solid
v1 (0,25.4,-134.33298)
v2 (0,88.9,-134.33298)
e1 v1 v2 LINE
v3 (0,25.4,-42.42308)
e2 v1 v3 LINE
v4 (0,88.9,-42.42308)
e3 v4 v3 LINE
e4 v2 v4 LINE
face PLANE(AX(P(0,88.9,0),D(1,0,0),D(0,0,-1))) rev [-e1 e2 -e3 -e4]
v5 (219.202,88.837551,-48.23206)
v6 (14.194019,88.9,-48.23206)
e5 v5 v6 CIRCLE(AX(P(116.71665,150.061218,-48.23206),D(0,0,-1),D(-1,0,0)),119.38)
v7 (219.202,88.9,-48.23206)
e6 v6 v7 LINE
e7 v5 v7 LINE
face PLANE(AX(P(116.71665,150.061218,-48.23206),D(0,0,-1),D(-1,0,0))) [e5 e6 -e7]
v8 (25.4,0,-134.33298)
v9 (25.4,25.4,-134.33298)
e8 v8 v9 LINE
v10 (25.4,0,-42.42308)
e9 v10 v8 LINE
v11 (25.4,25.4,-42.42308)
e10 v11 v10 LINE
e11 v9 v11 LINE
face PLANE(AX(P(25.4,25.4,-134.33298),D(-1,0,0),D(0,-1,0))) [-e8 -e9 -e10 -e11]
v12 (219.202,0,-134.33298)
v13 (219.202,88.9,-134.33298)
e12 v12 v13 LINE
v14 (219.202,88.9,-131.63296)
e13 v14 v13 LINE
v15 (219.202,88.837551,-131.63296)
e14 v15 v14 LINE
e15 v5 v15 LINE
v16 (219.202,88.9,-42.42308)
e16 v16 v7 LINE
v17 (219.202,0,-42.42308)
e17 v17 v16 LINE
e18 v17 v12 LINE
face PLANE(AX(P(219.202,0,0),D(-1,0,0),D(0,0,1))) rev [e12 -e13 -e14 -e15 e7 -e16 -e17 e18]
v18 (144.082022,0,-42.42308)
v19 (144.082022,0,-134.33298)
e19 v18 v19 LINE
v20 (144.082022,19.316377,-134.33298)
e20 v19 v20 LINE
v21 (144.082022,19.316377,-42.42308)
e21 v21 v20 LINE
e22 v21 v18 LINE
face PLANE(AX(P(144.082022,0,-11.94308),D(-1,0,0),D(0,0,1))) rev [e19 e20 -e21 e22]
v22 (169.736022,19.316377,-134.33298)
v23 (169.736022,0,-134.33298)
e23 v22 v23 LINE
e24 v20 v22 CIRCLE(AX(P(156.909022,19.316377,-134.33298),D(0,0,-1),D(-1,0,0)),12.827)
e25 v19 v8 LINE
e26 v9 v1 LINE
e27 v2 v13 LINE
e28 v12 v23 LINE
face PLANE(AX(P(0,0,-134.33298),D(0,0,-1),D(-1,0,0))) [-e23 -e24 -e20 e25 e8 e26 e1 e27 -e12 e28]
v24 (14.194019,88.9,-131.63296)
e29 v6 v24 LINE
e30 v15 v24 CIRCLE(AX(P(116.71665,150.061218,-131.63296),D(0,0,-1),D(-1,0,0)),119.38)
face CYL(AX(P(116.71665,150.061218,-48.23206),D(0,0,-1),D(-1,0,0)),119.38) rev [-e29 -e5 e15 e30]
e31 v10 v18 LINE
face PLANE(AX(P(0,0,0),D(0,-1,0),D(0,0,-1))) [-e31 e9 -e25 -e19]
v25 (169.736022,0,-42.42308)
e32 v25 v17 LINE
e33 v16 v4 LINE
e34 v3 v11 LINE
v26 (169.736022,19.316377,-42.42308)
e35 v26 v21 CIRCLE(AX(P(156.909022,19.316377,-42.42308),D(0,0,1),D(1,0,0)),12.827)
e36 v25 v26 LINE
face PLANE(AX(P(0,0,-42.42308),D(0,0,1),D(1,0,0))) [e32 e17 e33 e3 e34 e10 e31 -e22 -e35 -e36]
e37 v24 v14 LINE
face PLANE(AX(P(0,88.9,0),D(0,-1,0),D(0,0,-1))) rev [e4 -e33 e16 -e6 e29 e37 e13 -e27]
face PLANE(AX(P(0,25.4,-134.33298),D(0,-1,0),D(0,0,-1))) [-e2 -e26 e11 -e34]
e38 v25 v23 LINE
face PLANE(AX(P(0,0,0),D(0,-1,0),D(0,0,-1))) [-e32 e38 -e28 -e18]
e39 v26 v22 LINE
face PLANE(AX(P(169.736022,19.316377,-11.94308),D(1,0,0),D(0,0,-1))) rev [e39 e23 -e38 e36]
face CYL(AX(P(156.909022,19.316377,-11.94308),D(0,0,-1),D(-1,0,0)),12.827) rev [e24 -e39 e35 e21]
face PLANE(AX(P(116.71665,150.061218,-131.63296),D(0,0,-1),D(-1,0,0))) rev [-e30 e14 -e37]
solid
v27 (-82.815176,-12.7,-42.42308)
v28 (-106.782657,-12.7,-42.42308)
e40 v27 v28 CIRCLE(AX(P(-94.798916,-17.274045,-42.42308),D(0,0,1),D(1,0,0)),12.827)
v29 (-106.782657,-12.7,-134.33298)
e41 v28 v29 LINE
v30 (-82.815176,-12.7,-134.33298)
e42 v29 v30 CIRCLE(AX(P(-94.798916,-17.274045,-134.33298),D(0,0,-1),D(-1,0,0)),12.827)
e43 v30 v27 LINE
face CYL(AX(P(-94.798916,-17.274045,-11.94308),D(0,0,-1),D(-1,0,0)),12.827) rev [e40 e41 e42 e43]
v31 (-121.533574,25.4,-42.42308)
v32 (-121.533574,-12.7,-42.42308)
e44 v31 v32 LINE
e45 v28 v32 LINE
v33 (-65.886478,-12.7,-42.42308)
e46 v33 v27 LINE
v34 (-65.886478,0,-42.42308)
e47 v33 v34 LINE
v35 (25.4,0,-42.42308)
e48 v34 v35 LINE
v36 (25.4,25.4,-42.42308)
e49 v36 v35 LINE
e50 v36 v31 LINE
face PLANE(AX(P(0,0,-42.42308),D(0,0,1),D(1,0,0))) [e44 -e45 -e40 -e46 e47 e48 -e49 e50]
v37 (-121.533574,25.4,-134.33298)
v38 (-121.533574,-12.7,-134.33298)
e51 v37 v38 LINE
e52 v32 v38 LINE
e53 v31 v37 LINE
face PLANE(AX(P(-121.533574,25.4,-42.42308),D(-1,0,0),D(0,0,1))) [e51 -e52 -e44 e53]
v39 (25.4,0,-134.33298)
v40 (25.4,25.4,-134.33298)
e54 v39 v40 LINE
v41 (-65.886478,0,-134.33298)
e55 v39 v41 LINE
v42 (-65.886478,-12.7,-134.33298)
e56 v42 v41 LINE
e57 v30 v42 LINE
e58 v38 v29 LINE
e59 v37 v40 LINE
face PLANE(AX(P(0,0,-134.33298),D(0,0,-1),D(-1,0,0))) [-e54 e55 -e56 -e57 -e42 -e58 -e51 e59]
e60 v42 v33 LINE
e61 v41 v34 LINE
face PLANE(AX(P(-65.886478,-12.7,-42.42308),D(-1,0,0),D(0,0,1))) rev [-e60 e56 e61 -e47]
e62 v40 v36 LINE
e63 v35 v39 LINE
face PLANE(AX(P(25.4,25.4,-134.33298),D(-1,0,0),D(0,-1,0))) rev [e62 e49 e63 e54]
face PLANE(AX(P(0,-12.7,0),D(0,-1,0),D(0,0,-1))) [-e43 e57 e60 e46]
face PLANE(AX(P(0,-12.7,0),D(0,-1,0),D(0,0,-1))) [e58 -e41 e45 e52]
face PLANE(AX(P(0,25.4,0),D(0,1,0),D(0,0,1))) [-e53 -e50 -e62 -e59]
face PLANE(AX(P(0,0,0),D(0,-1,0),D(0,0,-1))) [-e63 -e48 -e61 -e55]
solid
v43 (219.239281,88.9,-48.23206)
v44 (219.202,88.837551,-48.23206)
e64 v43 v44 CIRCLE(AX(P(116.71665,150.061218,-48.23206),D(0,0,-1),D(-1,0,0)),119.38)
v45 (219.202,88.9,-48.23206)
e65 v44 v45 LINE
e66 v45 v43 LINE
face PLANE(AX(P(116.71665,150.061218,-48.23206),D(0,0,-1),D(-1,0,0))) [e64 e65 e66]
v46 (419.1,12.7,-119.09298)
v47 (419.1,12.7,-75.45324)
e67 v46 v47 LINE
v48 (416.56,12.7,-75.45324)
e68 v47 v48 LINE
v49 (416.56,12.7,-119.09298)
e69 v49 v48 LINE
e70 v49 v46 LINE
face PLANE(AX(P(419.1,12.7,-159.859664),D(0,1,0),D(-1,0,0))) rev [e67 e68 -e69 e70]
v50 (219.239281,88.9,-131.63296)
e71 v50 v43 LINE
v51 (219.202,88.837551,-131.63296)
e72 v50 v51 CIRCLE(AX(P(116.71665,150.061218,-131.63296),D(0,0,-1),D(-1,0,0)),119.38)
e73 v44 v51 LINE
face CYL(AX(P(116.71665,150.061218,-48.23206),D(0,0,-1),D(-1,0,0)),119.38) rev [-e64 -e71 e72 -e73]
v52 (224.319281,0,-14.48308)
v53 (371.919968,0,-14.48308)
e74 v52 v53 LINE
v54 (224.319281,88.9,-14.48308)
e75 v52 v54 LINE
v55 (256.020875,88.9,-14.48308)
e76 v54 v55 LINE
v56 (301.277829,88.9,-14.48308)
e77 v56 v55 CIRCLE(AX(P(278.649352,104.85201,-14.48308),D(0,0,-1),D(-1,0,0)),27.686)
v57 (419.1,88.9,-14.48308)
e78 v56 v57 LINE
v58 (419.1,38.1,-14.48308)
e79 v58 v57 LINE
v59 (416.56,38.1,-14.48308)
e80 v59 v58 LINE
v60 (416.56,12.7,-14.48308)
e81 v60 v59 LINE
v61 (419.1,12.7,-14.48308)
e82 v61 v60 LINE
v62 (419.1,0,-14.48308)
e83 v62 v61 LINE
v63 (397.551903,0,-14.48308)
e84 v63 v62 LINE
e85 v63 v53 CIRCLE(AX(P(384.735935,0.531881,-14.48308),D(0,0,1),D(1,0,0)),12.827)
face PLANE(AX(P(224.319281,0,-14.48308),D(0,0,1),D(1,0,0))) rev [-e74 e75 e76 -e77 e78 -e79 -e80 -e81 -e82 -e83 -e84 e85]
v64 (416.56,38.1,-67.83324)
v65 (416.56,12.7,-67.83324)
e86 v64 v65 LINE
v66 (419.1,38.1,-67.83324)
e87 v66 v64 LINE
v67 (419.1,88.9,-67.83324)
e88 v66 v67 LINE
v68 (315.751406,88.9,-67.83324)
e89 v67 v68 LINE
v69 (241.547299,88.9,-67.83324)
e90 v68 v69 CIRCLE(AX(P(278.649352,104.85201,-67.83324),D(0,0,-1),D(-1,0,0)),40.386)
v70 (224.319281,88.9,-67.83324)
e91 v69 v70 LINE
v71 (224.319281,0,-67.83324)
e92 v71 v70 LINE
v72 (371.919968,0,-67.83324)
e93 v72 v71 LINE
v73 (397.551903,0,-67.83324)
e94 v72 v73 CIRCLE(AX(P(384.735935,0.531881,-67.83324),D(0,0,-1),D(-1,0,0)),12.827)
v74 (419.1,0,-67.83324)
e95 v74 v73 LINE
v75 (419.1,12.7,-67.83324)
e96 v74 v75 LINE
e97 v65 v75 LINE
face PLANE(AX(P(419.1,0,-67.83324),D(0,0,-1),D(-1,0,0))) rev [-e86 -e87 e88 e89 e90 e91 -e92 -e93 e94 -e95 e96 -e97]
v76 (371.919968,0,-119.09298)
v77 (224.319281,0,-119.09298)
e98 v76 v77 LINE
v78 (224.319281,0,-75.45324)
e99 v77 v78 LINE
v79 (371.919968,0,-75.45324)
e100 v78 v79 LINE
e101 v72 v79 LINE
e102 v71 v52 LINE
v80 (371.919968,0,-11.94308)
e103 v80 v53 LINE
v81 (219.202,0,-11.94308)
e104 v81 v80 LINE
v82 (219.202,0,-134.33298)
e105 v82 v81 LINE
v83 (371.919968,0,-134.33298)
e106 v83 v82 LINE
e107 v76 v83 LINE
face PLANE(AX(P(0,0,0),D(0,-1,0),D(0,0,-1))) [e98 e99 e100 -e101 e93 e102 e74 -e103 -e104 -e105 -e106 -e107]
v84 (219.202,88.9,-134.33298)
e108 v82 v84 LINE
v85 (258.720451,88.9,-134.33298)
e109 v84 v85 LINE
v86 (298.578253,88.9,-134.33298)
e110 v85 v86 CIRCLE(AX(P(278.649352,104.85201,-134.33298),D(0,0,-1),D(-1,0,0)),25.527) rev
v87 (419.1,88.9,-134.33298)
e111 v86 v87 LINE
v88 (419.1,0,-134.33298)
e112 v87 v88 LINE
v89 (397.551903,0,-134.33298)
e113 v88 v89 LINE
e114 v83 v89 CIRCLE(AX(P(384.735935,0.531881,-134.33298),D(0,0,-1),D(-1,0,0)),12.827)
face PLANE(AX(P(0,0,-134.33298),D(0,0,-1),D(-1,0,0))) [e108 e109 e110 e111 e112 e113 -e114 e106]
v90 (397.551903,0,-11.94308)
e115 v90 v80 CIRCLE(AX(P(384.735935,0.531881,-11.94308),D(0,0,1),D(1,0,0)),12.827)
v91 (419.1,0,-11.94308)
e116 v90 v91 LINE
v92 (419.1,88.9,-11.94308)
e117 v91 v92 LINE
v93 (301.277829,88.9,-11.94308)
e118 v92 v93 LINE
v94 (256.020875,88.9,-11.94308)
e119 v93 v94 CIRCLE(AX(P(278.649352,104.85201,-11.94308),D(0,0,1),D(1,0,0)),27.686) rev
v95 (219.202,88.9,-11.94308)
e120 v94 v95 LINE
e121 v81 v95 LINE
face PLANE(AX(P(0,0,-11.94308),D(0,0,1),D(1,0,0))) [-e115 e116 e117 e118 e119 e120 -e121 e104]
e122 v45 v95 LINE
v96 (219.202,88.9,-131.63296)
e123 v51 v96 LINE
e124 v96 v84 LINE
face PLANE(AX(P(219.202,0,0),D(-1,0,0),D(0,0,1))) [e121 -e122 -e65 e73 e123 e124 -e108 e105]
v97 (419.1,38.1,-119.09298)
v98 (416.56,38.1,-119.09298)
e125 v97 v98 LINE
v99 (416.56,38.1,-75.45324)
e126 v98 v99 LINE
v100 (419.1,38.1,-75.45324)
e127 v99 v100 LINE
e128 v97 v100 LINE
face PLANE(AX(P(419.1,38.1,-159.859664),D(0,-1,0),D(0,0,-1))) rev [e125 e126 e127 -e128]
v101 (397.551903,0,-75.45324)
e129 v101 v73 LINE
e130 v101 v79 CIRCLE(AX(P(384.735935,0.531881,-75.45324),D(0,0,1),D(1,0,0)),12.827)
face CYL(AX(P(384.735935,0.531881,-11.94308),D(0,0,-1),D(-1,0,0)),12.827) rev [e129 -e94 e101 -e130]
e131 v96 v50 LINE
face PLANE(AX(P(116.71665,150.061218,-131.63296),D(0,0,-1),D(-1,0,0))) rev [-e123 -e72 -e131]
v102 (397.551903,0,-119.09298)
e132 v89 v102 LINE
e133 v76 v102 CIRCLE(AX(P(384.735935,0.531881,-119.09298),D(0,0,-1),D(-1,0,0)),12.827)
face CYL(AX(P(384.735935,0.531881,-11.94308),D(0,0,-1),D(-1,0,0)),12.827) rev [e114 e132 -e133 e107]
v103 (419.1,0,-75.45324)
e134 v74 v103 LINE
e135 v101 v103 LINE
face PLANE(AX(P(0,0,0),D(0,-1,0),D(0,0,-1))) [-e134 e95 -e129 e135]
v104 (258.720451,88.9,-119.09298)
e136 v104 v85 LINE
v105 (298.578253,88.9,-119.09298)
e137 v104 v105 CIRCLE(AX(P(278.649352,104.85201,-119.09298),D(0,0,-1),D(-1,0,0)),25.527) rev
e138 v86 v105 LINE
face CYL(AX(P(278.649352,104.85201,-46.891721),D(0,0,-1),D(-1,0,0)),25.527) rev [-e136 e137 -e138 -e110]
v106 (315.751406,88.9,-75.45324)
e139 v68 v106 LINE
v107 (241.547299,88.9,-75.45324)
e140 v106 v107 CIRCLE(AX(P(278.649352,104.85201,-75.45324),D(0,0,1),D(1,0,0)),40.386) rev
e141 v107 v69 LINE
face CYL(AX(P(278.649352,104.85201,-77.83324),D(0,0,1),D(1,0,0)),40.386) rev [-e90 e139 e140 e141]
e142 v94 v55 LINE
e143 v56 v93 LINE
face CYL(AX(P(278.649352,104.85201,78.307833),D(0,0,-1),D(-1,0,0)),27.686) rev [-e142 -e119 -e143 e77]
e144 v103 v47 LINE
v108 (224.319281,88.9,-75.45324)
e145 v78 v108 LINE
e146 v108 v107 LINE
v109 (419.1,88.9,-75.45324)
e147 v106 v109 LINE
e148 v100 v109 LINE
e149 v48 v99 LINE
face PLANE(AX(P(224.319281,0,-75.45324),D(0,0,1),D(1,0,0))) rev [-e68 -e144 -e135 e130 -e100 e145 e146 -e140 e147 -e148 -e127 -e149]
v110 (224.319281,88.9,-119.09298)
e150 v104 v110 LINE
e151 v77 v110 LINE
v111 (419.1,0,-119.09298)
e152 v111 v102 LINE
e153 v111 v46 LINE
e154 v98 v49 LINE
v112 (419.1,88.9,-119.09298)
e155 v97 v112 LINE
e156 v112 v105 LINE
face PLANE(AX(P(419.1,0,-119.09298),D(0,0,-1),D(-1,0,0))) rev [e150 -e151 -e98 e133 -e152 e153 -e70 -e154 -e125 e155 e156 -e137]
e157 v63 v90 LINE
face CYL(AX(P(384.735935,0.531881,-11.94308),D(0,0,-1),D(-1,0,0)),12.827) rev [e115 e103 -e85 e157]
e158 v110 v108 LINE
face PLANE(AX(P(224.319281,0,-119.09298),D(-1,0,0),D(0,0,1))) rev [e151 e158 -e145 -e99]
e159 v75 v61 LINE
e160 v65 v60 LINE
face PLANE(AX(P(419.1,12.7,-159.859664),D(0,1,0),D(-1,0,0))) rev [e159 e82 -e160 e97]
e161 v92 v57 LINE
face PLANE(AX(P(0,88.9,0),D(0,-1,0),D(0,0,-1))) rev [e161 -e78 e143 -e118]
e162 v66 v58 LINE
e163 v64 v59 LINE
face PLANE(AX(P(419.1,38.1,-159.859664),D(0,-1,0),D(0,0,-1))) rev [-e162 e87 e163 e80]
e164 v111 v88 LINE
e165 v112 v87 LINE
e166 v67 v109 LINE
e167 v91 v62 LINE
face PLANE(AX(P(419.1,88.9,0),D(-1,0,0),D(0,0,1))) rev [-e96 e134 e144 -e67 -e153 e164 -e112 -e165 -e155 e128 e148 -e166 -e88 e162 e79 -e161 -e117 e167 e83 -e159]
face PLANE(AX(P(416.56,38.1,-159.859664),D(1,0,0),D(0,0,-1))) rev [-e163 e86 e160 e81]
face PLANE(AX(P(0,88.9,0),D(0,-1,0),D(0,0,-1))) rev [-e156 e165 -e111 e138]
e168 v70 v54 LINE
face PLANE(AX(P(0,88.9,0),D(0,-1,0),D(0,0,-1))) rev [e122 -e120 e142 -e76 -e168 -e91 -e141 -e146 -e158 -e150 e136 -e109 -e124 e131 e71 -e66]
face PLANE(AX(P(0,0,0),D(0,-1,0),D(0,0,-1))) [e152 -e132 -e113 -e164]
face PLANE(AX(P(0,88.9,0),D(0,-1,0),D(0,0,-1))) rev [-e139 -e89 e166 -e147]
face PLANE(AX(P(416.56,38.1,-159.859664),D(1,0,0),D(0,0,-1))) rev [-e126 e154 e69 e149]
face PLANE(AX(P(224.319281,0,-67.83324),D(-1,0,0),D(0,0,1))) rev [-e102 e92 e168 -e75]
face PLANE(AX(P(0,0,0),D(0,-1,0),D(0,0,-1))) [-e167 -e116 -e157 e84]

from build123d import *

# Parameters (mm, degrees)
SKETCH1_W           = 419.1
SKETCH1_H           = 142.18412
BOSS_EXTRUDE1_DEPTH = 88.9
SKETCH2_R           = 119.38
CUT_EXTRUDE1_DEPTH  = 83.4009
SKETCH7_W           = 194.780719179
SKETCH7_H           = 43.63974
SKETCH7_H_2         = 53.35016
CUT_EXTRUDE2_DEPTH  = 452.402640644
SKETCH4_R           = 40.386
CUT_EXTRUDE4_DEPTH  = 10
SKETCH18_R          = 25.527
CUT_EXTRUDE11_DEPTH = 23.09114
SKETCH5_R           = 27.686
CUT_EXTRUDE5_DEPTH  = 14.48308
SKETCH8_W           = 419.1
SKETCH8_H           = 88.9
CUT_EXTRUDE6_DEPTH  = 7.85114
SKETCH9_W           = 419.1
SKETCH9_H           = 88.9
CUT_EXTRUDE7_DEPTH  = 11.94308
SKETCH10_W          = 219.202
SKETCH10_H          = 88.9
CUT_EXTRUDE8_DEPTH  = 30.48
SKETCH12_W          = 121.533574186
SKETCH12_H          = 91.9099
BOSS_EXTRUDE2_DEPTH = 25.4
SKETCH14_W          = 55.647095764
SKETCH14_H          = 91.9099
BOSS_EXTRUDE3_DEPTH = 12.7
SKETCH17_R          = 12.827
CUT_EXTRUDE10_DEPTH = 446.564033133
SKETCH20_W          = 2.54
SKETCH20_H          = 25.4
BOSS_EXTRUDE4_DEPTH = 104.6099
SPLIT2_START        = -121.533574186
SPLIT2_DEPTH        = 340.735574186
SPLIT2_START_2      = -134.33298
SPLIT2_2_DEPTH      = 91.9099
SPLIT2_START_3      = -48.23206
SPLIT2_3_DEPTH      = 5.80898
SPLIT2_4_DEPTH      = 2.70002
SPLIT2_5_DEPTH      = 91.9099


# Read off the part's stored shape, not the designer's step: Split2
with BuildPart() as part:
    # Sketch1 → Boss-Extrude1 (new body)
    with BuildSketch(Plane(origin=(0, 0, 0), x_dir=(1, 0, 0), z_dir=(0, 1, 0))):
        with Locations((209.55, 71.09206)):
            Rectangle(SKETCH1_W, SKETCH1_H)
    extrude(amount=BOSS_EXTRUDE1_DEPTH)

    # Sketch2 → Cut-Extrude1 (cut)
    with BuildSketch(Plane(origin=(0, 0, -131.63296), x_dir=(-1, 0, 0), z_dir=(0, 0, -1))):
        with Locations((-116.7166499, 150.061217688)):
            Circle(SKETCH2_R)
    extrude(amount=-CUT_EXTRUDE1_DEPTH, mode=Mode.SUBTRACT)

    # Sketch7 → Cut-Extrude2 (cut, through all)
    with BuildSketch(Plane(origin=(0, 88.9, 0), x_dir=(1, 0, 0), z_dir=(0, 1, 0))):
        with Locations((321.709640411, 97.27311)):
            Rectangle(SKETCH7_W, SKETCH7_H)
        with Locations((321.709640411, 41.15816)):
            Rectangle(SKETCH7_W, SKETCH7_H_2)
    extrude(amount=-CUT_EXTRUDE2_DEPTH, mode=Mode.SUBTRACT)

    # Sketch4 → Cut-Extrude4 (cut)
    with BuildSketch(Plane(origin=(0, 0, -67.83324), x_dir=(-1, 0, 0), z_dir=(0, 0, -1))):
        with Locations((-278.649352085, 104.852009966)):
            Circle(SKETCH4_R)
    extrude(amount=CUT_EXTRUDE4_DEPTH, mode=Mode.SUBTRACT)

    # Sketch18 → Cut-Extrude11 (cut)
    with BuildSketch(Plane(origin=(0, 0, -142.18412), x_dir=(-1, 0, 0), z_dir=(0, 0, -1))):
        with Locations((-278.649352085, 104.852009966)):
            Circle(SKETCH18_R)
    extrude(amount=-CUT_EXTRUDE11_DEPTH, mode=Mode.SUBTRACT)

    # Sketch5 → Cut-Extrude5 (cut)
    with BuildSketch(Plane(origin=(0, 0, -14.48308), x_dir=(-1, 0, 0), z_dir=(0, 0, -1))):
        with Locations((-278.649352085, 104.852009966)):
            Circle(SKETCH5_R)
    extrude(amount=-CUT_EXTRUDE5_DEPTH, mode=Mode.SUBTRACT)

    # Sketch8 → Cut-Extrude6 (cut)
    with BuildSketch(Plane(origin=(0, 0, -142.18412), x_dir=(-1, 0, 0), z_dir=(0, 0, -1))):
        with Locations((-209.55, 44.45)):
            Rectangle(SKETCH8_W, SKETCH8_H)
    extrude(amount=-CUT_EXTRUDE6_DEPTH, mode=Mode.SUBTRACT)

    # Sketch9 → Cut-Extrude7 (cut)
    with BuildSketch(Plane.XY):
        with Locations((209.55, 44.45)):
            Rectangle(SKETCH9_W, SKETCH9_H)
    extrude(amount=-CUT_EXTRUDE7_DEPTH, mode=Mode.SUBTRACT)

    # Sketch10 → Cut-Extrude8 (cut)
    with BuildSketch(Plane.XY.offset(-11.94308)):
        with Locations((109.601, 44.45)):
            Rectangle(SKETCH10_W, SKETCH10_H)
    extrude(amount=-CUT_EXTRUDE8_DEPTH, mode=Mode.SUBTRACT)

    # Sketch12 → Boss-Extrude2 (add)
    with BuildSketch(Plane.XZ):
        with Locations((-60.766787093, -88.37803)):
            Rectangle(SKETCH12_W, SKETCH12_H)
    extrude(amount=-BOSS_EXTRUDE2_DEPTH)

    # Sketch14 → Boss-Extrude3 (add)
    with BuildSketch(Plane.XZ):
        with Locations((-93.710026304, -88.37803)):
            Rectangle(SKETCH14_W, SKETCH14_H)
    extrude(amount=BOSS_EXTRUDE3_DEPTH)

    # Sketch17 → Cut-Extrude10 (cut, through all)
    with BuildSketch(Plane(origin=(0, 0, -134.33298), x_dir=(-1, 0, 0), z_dir=(0, 0, -1))):
        with Locations((-384.735935495, 0.531880938)):
            Circle(SKETCH17_R)
        with Locations((94.798916194, -17.274045482)):
            Circle(SKETCH17_R)
        with BuildLine():
            Line((-169.736021607, 19.31637742), (-169.736021607, 0))
            Line((-169.736021607, 0), (-144.082021607, 0))
            Line((-144.082021607, 0), (-144.082021607, 19.31637742))
            ThreePointArc((-144.082021607, 19.31637742), (-156.909021607, 32.14337742), (-169.736021607, 19.31637742))
        make_face()
    extrude(amount=-CUT_EXTRUDE10_DEPTH, mode=Mode.SUBTRACT)

    # Sketch20 → Boss-Extrude4 (add)
    with BuildSketch(Plane(origin=(0, 0, -14.48308), x_dir=(-1, 0, 0), z_dir=(0, 0, -1))):
        with Locations((-417.83, 25.4)):
            Rectangle(SKETCH20_W, SKETCH20_H)
    extrude(amount=BOSS_EXTRUDE4_DEPTH)

    # Split2 outline → Split2 (cut)
    with BuildSketch(Plane.YZ.offset(SPLIT2_START)):
        Polygon((-12.7, -42.42308), (-12.7, -134.33298), (88.9, -134.33298), (88.9, -131.63296), (88.9, -48.23206), (88.9, -42.42308), align=None)
    extrude(amount=SPLIT2_DEPTH, mode=Mode.SUBTRACT)


with BuildPart() as body_2:
    # Split2 2 outline → Split2 2 (new body)
    with BuildSketch(Plane.XY.offset(SPLIT2_START_2)):
        with BuildLine():
            Line((219.202, 0), (219.202, 88.837550574))
            ThreePointArc((219.202, 88.837550574), (116.680284427, 30.681223227), (14.194018979, 88.9))
            Line((14.194018979, 88.9), (0, 88.9))
            Line((0, 88.9), (0, 25.4))
            Line((0, 25.4), (25.4, 25.4))
            Line((25.4, 25.4), (25.4, 0))
            Line((25.4, 0), (144.082021607, 0))
            Line((144.082021607, 0), (144.082021607, 19.31637742))
            ThreePointArc((144.082021607, 19.31637742), (156.909021607, 32.14337742), (169.736021607, 19.31637742))
            Line((169.736021607, 19.31637742), (169.736021607, 0))
            Line((169.736021607, 0), (219.202, 0))
        make_face()
    extrude(amount=SPLIT2_2_DEPTH)

    # Split2 3 outline → Split2 3 (add)
    with BuildSketch(Plane.XY.offset(SPLIT2_START_3)):
        with BuildLine():
            Line((219.202, 88.837550574), (219.202, 88.9))
            Line((219.202, 88.9), (14.194018979, 88.9))
            ThreePointArc((14.194018979, 88.9), (116.680284427, 30.681223227), (219.202, 88.837550574))
        make_face()
    extrude(amount=SPLIT2_3_DEPTH)

    # Split2 4 outline → Split2 4 (add)
    with BuildSketch(Plane.XY.offset(SPLIT2_START_2)):
        with BuildLine():
            Line((219.202, 88.837550574), (219.202, 88.9))
            Line((219.202, 88.9), (14.194018979, 88.9))
            ThreePointArc((14.194018979, 88.9), (116.680284427, 30.681223227), (219.202, 88.837550574))
        make_face()
    extrude(amount=SPLIT2_4_DEPTH)


with BuildPart() as body_3:
    # Split2 5 outline → Split2 5 (new body)
    with BuildSketch(Plane.XY.offset(SPLIT2_START_2)):
        with BuildLine():
            Line((25.4, 0), (25.4, 25.4))
            Line((25.4, 25.4), (-121.533574186, 25.4))
            Line((-121.533574186, 25.4), (-121.533574186, -12.7))
            Line((-121.533574186, -12.7), (-106.782656717, -12.7))
            ThreePointArc((-106.782656717, -12.7), (-94.798916194, -4.447045482), (-82.815175671, -12.7))
            Line((-82.815175671, -12.7), (-65.886478422, -12.7))
            Line((-65.886478422, -12.7), (-65.886478422, 0))
            Line((-65.886478422, 0), (25.4, 0))
        make_face()
    extrude(amount=SPLIT2_5_DEPTH)


solid = Compound([part.part, body_2.part, body_3.part])
